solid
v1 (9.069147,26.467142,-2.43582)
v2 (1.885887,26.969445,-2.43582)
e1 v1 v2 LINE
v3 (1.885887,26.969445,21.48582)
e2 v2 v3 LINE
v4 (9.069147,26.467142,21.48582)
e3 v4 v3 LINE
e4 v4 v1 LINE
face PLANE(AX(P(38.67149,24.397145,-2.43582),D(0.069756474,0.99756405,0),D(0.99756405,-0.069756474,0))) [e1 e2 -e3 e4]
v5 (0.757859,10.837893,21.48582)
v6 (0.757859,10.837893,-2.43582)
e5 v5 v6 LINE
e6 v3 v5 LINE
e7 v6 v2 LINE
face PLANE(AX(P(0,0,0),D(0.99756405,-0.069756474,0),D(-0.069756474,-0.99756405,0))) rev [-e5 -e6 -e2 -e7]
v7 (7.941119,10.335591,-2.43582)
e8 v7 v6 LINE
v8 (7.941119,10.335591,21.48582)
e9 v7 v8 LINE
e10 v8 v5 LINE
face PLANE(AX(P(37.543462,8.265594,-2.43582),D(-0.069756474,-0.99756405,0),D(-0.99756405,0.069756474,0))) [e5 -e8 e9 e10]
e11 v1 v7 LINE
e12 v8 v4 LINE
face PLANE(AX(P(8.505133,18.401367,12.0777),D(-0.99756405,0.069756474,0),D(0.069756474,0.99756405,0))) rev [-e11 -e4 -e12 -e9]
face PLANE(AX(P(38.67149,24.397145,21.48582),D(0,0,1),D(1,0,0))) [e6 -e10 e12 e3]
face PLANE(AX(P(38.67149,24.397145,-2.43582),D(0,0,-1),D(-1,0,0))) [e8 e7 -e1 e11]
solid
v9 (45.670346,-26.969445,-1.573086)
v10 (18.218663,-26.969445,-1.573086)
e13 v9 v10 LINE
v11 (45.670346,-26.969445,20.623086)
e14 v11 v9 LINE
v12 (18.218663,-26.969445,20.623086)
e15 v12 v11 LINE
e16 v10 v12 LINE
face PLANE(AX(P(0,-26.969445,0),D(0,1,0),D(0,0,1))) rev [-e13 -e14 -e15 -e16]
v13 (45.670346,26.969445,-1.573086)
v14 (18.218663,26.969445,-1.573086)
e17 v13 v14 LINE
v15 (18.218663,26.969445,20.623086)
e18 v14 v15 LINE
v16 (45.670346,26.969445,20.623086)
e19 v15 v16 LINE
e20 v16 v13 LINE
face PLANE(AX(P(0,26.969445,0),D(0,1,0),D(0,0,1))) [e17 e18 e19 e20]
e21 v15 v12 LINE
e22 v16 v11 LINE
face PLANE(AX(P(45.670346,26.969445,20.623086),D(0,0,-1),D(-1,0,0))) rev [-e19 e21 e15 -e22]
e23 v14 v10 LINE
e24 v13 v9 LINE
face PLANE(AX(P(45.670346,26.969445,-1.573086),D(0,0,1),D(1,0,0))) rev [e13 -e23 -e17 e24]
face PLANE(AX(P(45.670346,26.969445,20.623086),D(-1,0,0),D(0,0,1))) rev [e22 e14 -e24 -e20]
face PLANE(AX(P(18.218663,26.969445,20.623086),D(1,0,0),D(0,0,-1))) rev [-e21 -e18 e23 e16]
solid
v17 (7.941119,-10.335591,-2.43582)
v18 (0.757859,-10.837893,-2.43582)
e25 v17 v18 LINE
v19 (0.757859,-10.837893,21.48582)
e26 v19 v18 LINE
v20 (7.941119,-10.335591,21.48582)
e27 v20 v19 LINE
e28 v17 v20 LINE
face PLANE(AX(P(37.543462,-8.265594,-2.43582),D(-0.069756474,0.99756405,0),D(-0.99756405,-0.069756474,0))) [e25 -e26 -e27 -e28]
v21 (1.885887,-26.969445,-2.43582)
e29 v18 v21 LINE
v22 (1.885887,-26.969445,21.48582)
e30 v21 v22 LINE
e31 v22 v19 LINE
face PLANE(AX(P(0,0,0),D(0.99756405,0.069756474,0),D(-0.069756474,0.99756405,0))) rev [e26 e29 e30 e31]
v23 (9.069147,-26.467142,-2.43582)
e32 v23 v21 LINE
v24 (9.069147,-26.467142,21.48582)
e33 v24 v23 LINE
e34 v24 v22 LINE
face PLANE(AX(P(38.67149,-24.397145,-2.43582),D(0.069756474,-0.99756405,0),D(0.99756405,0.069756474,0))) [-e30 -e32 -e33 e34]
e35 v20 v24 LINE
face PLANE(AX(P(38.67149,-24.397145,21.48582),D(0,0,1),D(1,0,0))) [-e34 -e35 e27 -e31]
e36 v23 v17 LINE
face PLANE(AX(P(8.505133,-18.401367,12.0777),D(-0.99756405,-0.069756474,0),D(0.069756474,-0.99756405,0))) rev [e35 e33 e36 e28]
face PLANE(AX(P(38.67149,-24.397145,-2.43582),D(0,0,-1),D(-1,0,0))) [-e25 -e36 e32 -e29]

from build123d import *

# Parameters (mm, degrees)
BODY_DEPTH                     = 19.05
SKETCH4_R                      = 5.9436
F_10_HEAD_CLEARANCE_DEPTH      = 48.971655672
F_10_NUT_CLEARANCE_DEPTH       = 46.868801757
F_10_NUT_CLEARANCE_DEPTH_BACK  = 4.7625
FILLET2_R                      = 8.89
F_10_CLEARANCE_HOLE1_D         = 5.1054
FILLET3_R                      = 5.08
FILLET4_R                      = 2.54
F_10_CLEARANCE_HOLE2_D         = 5.1054
SKETCH11_W                     = 23.92163958
SKETCH11_H                     = 16.170942948
INFILL_BOX_MOUNT_DEPTH         = 7.2008
INFILL_BOUNDING_BOX_DEPTH      = 26.969445
INFILL_BOUNDING_BOX_DEPTH_BACK = 26.969445
SKETCH9_W                      = 27.451683019
SKETCH9_H                      = 22.196172726


# Read off the part's stored shape, not the designer's step: Body
with BuildPart() as part:
    # Body outline → Body (new body)
    with BuildSketch(Plane.XY):
        with BuildLine():
            ThreePointArc((19.563256599, 8.1915), (16.002518677, 13.919090379), (10.823670896, 18.239238727))
            Line((10.823670896, 18.239238727), (11.330509573, 25.487369503))
            Line((11.330509573, 25.487369503), (1.828711995, 26.151799916))
            Line((1.828711995, 26.151799916), (0.815034639, 11.655538363))
            ThreePointArc((0.815034639, 11.655538363), (11.684, 0), (0.815034639, -11.655538363))
            Line((0.815034639, -11.655538363), (1.828711995, -26.151799916))
            Line((1.828711995, -26.151799916), (11.330509573, -25.487369503))
            Line((11.330509573, -25.487369503), (10.823670896, -18.239238727))
            ThreePointArc((10.823670896, -18.239238727), (16.002518677, -13.919090379), (19.563256599, -8.1915))
            Line((19.563256599, -8.1915), (41.469504125, -8.1915))
            Line((41.469504125, -8.1915), (41.469504125, -5.0165))
            Line((41.469504125, -5.0165), (20.607193131, -5.0165))
            ThreePointArc((20.607193131, -5.0165), (20.948626487, -3.313114744), (21.149504125, -1.5875))
            Line((21.149504125, -1.5875), (41.469504125, -1.5875))
            Line((41.469504125, -1.5875), (41.469504125, 1.5875))
            Line((41.469504125, 1.5875), (21.149504125, 1.5875))
            ThreePointArc((21.149504125, 1.5875), (20.948626487, 3.313114744), (20.607193131, 5.0165))
            Line((20.607193131, 5.0165), (41.469504125, 5.0165))
            Line((41.469504125, 5.0165), (41.469504125, 8.1915))
            Line((41.469504125, 8.1915), (19.563256599, 8.1915))
        make_face()
    extrude(amount=BODY_DEPTH)

    # Sketch3 → CBORE for #10 Binding Head Machine Screw1 (revolve, cut)
    with BuildSketch(Plane(origin=(10.823670896, -18.239238727, 9.525), x_dir=(-0.06975647374412856, 0.9975640502598241, 0), z_dir=(0, 0, 1))):
        Polygon((0, 0), (0, 10.536208088), (2.5527, 10.536208088), (2.5527, 3.1242), (5.9436, 3.1242), (5.9436, 0), align=None)
    revolve(axis=Axis((17.158202615, -17.796285119, 9.525), (-0.9975640502598241, -0.06975647374412855, 0)), mode=Mode.SUBTRACT)

    # Sketch4 → #10 Head clearance (cut, through all)
    with BuildSketch(Plane(origin=(6.385207973, 0.446497237, 0), x_dir=(-0.06975647374412856, 0.9975640502598241, 0), z_dir=(0.9975640502598241, 0.06975647374412856, 0))):
        with Locations((-18.949829973, 9.525)):
            Circle(SKETCH4_R)
    extrude(amount=F_10_HEAD_CLEARANCE_DEPTH, mode=Mode.SUBTRACT)

    # Sketch5 → #10 nut clearance (cut, two sides: drawn at the far end of the back side and taken through both)
    with BuildSketch(Plane(origin=(9.501797579, -0.664430412, 0), x_dir=(-0.06975647374412855, -0.9975640502598241, 0), z_dir=(0.9975640502598241, -0.06975647374412855, 0)).offset(-F_10_NUT_CLEARANCE_DEPTH_BACK)):
        Polygon((-23.902829973, -6.665384117), (-23.902829973, -12.384615883), (-18.949829973, -15.244231767), (-13.996829973, -12.384615883), (-13.996829973, -6.665384117), (-18.949829973, -3.805768233), align=None)
    extrude(amount=F_10_NUT_CLEARANCE_DEPTH + F_10_NUT_CLEARANCE_DEPTH_BACK, mode=Mode.SUBTRACT)

    # Fillet2
    fillet2_edges = [part.edges().sort_by_distance(p)[0] for p in [
        (41.469504125, 6.604, 0),
        (41.469504125, 0, 0),
        (41.469504125, -6.604, 0),
        (41.469504125, -6.604, 19.05),
        (41.469504125, 0, 19.05),
        (41.469504125, 6.604, 19.05),
    ]]
    fillet(fillet2_edges, radius=FILLET2_R)

    # #10 Clearance Hole1 (through all)
    with Locations(Plane(origin=(0, -8.1915, 0), x_dir=(-1, 0, 0), z_dir=(0, -1, 0))):
        with Locations((-31.944504125, -9.525)):
            Hole(F_10_CLEARANCE_HOLE1_D / 2)

    # Fillet3
    fillet3_edges = [part.edges().sort_by_distance(p)[0] for p in [
        (19.563256599, 8.1915, 9.525),
        (19.563256599, -8.1915, 9.525),
    ]]
    fillet(fillet3_edges, radius=FILLET3_R)

    # Fillet4
    # the kernel refuses this fillet: 2.54 mm, written as the material it adds along each edge
    with BuildSketch(Plane(origin=(10.823670896, 18.239238727, 0), x_dir=(0.06975647364615441, 0.997564050266675, 0), z_dir=(0, 0, 1))) as fillet4_piece_1_section:
        with BuildLine():
            CenterArc((1.506239444, -2.54), FILLET4_R, 90, 59.467874794)
            ThreePointArc((-0.681575467, -1.249625668), (-0.330301403, -0.630532327), (0, 0))
            Line((0, 0), (1.506239444, 0))
        make_face()
    fillet4_piece_1 = extrude(amount=7.571366843, mode=Mode.PRIVATE)
    fillet4_piece_1 = split(fillet4_piece_1, bisect_by=Plane(origin=(11.045496334, 17.483235197, 3.379286412), z_dir=(0.034878236872064254, 0.49878202512991177, -0.8660254037844389)), keep=Keep.TOP, mode=Mode.PRIVATE)
    fillet4_piece_1 = split(fillet4_piece_1, bisect_by=Plane(origin=(11.16675059, 19.217251842, 3.228670408), z_dir=(-0.0348782368720643, -0.49878202512991243, -0.8660254037844384)), keep=Keep.TOP, mode=Mode.PRIVATE)
    add(fillet4_piece_1)
    with BuildSketch(Plane(origin=(10.823670896, 18.239238727, 0), x_dir=(0.06975647364615441, 0.997564050266675, 0), z_dir=(0, 0, 1))) as fillet4_piece_2_section:
        with BuildLine():
            CenterArc((1.506239444, -2.54), FILLET4_R, 90, 59.467874794)
            ThreePointArc((-0.681575467, -1.249625668), (-0.330301403, -0.630532327), (0, 0))
            Line((0, 0), (1.506239444, 0))
        make_face()
    fillet4_piece_2 = extrude(amount=7.571366843, mode=Mode.PRIVATE)
    fillet4_piece_2 = split(fillet4_piece_2, bisect_by=Plane(origin=(11.538192523, 17.902598899, 3.640659173), z_dir=(-0.034878236872064254, -0.49878202512991177, 0.8660254037844389)), keep=Keep.TOP, mode=Mode.PRIVATE)
    fillet4_piece_2 = split(fillet4_piece_2, bisect_by=Plane(origin=(11.538192523, 17.902598899, 3.970877294), z_dir=(-0.0348782368720643, -0.49878202512991243, -0.8660254037844384)), keep=Keep.TOP, mode=Mode.PRIVATE)
    add(fillet4_piece_2)
    with BuildSketch(Plane(origin=(10.823670896, 18.239238727, 0), x_dir=(0.06975647364615441, 0.997564050266675, 0), z_dir=(0, 0, 1))) as fillet4_piece_3_section:
        with BuildLine():
            CenterArc((1.506239444, -2.54), FILLET4_R, 90, 59.467874794)
            ThreePointArc((-0.681575467, -1.249625668), (-0.330301403, -0.630532327), (0, 0))
            Line((0, 0), (1.506239444, 0))
        make_face()
    fillet4_piece_3 = extrude(amount=7.571366843, mode=Mode.PRIVATE)
    fillet4_piece_3 = split(fillet4_piece_3, bisect_by=Plane(origin=(10.910701379, 18.802736053, 4.133816124), z_dir=(0.034878236872064254, 0.49878202512991177, -0.8660254037844389)), keep=Keep.TOP, mode=Mode.PRIVATE)
    fillet4_piece_3 = split(fillet4_piece_3, bisect_by=Plane(origin=(10.910701379, 18.802736053, 3.477720343), z_dir=(0.0348782368720643, 0.49878202512991243, 0.8660254037844384)), keep=Keep.TOP, mode=Mode.PRIVATE)
    add(fillet4_piece_3)
    with BuildSketch(Plane(origin=(10.823670896, 18.239238727, 11.478633157), x_dir=(0.06975647364615441, 0.997564050266675, 0), z_dir=(0, 0, 1))) as fillet4_piece_4_section:
        with BuildLine():
            CenterArc((1.506239444, -2.54), FILLET4_R, 90, 59.467874794)
            ThreePointArc((-0.681575467, -1.249625668), (-0.330301403, -0.630532327), (0, 0))
            Line((0, 0), (1.506239444, 0))
        make_face()
    fillet4_piece_4 = extrude(amount=7.571366843, mode=Mode.PRIVATE)
    fillet4_piece_4 = split(fillet4_piece_4, bisect_by=Plane(origin=(11.538192523, 17.902598899, 15.409340827), z_dir=(-0.03487823687206431, -0.4987820251299125, -0.8660254037844386)), keep=Keep.TOP, mode=Mode.PRIVATE)
    fillet4_piece_4 = split(fillet4_piece_4, bisect_by=Plane(origin=(11.538192523, 17.902598899, 15.079122706), z_dir=(-0.034878236872064254, -0.49878202512991177, 0.8660254037844388)), keep=Keep.TOP, mode=Mode.PRIVATE)
    add(fillet4_piece_4)
    with BuildSketch(Plane(origin=(10.823670896, 18.239238727, 11.478633157), x_dir=(0.06975647364615441, 0.997564050266675, 0), z_dir=(0, 0, 1))) as fillet4_piece_5_section:
        with BuildLine():
            CenterArc((1.506239444, -2.54), FILLET4_R, 90, 59.467874794)
            ThreePointArc((-0.681575467, -1.249625668), (-0.330301403, -0.630532327), (0, 0))
            Line((0, 0), (1.506239444, 0))
        make_face()
    fillet4_piece_5 = extrude(amount=7.571366843, mode=Mode.PRIVATE)
    fillet4_piece_5 = split(fillet4_piece_5, bisect_by=Plane(origin=(10.910701379, 18.802736053, 14.916183876), z_dir=(0.03487823687206431, 0.4987820251299125, 0.8660254037844386)), keep=Keep.TOP, mode=Mode.PRIVATE)
    fillet4_piece_5 = split(fillet4_piece_5, bisect_by=Plane(origin=(10.910701379, 18.802736053, 15.572279657), z_dir=(0.034878236872064254, 0.49878202512991177, -0.8660254037844388)), keep=Keep.TOP, mode=Mode.PRIVATE)
    add(fillet4_piece_5)
    with BuildSketch(Plane(origin=(10.823670896, 18.239238727, 11.478633157), x_dir=(0.06975647364615441, 0.997564050266675, 0), z_dir=(0, 0, 1))) as fillet4_piece_6_section:
        with BuildLine():
            CenterArc((1.506239444, -2.54), FILLET4_R, 90, 59.467874794)
            ThreePointArc((-0.681575467, -1.249625668), (-0.330301403, -0.630532327), (0, 0))
            Line((0, 0), (1.506239444, 0))
        make_face()
    fillet4_piece_6 = extrude(amount=7.571366843, mode=Mode.PRIVATE)
    fillet4_piece_6 = split(fillet4_piece_6, bisect_by=Plane(origin=(11.045496334, 17.483235197, 15.670713588), z_dir=(0.03487823687206431, 0.4987820251299125, 0.8660254037844386)), keep=Keep.TOP, mode=Mode.PRIVATE)
    fillet4_piece_6 = split(fillet4_piece_6, bisect_by=Plane(origin=(11.16675059, 19.217251842, 15.821329592), z_dir=(-0.034878236872064254, -0.49878202512991177, 0.8660254037844388)), keep=Keep.TOP, mode=Mode.PRIVATE)
    add(fillet4_piece_6)
    with BuildSketch(Plane(origin=(10.823670896, -18.239238727, 0), x_dir=(0.8423668352181145, 0.5389045508479382, 0), z_dir=(0, 0, 1))) as fillet4_piece_7_section:
        with BuildLine():
            CenterArc((1.50864912, -2.538569498), FILLET4_R, 91.92302723, 59.467874794)
            Line((-0.721234541, -1.322338081), (0, 0))
            ThreePointArc((0, 0), (0.711707353, -0.011944694), (1.423414707, 0))
        make_face()
    fillet4_piece_7 = extrude(amount=7.34699861, mode=Mode.PRIVATE)
    fillet4_piece_7 = fillet4_piece_7 - Plane(origin=(11.093024208, -18.220403709, 9.525), x_dir=(-0.06975647374412856, 0.9975640502598241, 0), z_dir=(-0.9975640502598241, -0.06975647374412856, 0)) * Cylinder(5.9436, 21, mode=Mode.PRIVATE)
    add(fillet4_piece_7)
    with BuildSketch(Plane(origin=(10.823670896, -18.239238727, 11.70300139), x_dir=(0.8423668352181142, 0.5389045508479389, 0), z_dir=(0, 0, 1))) as fillet4_piece_8_section:
        with BuildLine():
            CenterArc((1.50864912, -2.538569498), FILLET4_R, 91.92302723, 59.467874794)
            Line((-0.721234541, -1.322338081), (0, 0))
            ThreePointArc((0, 0), (0.711707353, -0.011944694), (1.423414707, 0))
        make_face()
    fillet4_piece_8 = extrude(amount=7.34699861, mode=Mode.PRIVATE)
    fillet4_piece_8 = fillet4_piece_8 - Plane(origin=(11.09302416, -18.220403712, 9.525), x_dir=(-0.06975647374412856, 0.9975640502598241, 0), z_dir=(-0.9975640502598241, -0.06975647374412856, 0)) * Cylinder(5.9436, 21, mode=Mode.PRIVATE)
    add(fillet4_piece_8)
    # the kernel refuses this fillet: 2.54 mm, written as the material it takes off along each edge
    with BuildSketch(Plane(origin=(11.330509573, -25.487369503, -6.349999999), x_dir=(-0.06975647364615452, 0.997564050266675, 0), z_dir=(0, 0, 1)), Plane(origin=(11.330509573, 25.487369503, -6.349999999), x_dir=(-0.997564050255164, 0.06975647381076958, 0), z_dir=(0, 0, 1))) as fillet4_2_piece_1:
        with BuildLine():
            CenterArc((FILLET4_R, FILLET4_R), FILLET4_R, 180.000000009, 89.999999991)
            Line((-FILLET4_R * 1.65018418464e-10, FILLET4_R), (0, 0))
            Line((0, 0), (FILLET4_R, 0))
        make_face()
    extrude(amount=31.749999998, mode=Mode.SUBTRACT)
    with BuildSketch(Plane(origin=(1.828711995, -26.151799916, -6.35), x_dir=(0.9975640502551639, 0.0697564738107699, 0), z_dir=(0, 0, 1)), Plane(origin=(1.828711995, 26.151799916, -6.35), x_dir=(-0.06975647377832653, -0.9975640502574327, 0), z_dir=(0, 0, 1))) as fillet4_2_piece_2:
        with BuildLine():
            CenterArc((FILLET4_R, FILLET4_R), FILLET4_R, 179.999999998, 90.000000002)
            Line((0, FILLET4_R), (0, 0))
            Line((0, 0), (FILLET4_R, 0))
        make_face()
    extrude(amount=31.75, mode=Mode.SUBTRACT)
    with BuildSketch(Plane(origin=(0.815034639, -11.655538363, -5.778442378), x_dir=(0.06975647377832637, -0.9975640502574326, 0), z_dir=(0, 0, 1))) as fillet4_2_piece_3:
        with BuildLine():
            CenterArc((2.311376951, 2.54), FILLET4_R, 190.286560608, 79.713439392)
            ThreePointArc((-0.187797504, 2.086428572), (-0.047044084, 1.047431631), (0, 0))
            Line((0, 0), (2.311376951, 0))
        make_face()
    extrude(amount=30.606884756, mode=Mode.SUBTRACT)
    with BuildSketch(Plane(origin=(0.815034639, 11.655538363, -5.778442378), x_dir=(0.9872940550084358, -0.1589038984575255, 0), z_dir=(0, 0, 1))) as fillet4_2_piece_4:
        with BuildLine():
            CenterArc((2.322565791, 2.529773025), FILLET4_R, 185.143280302, 79.713439392)
            Line((-0.207207235, 2.302070497), (0, 0))
            ThreePointArc((0, 0), (1.047431631, 0.047044085), (2.094863262, 0))
        make_face()
    extrude(amount=30.606884756, mode=Mode.SUBTRACT)

    # #10 Clearance Hole2 (through all)
    with Locations(Plane(origin=(4.750898789, -0.332215206, 0), x_dir=(0, 0, -1), z_dir=(0.9975640502598241, -0.06975647374412854, 0))):
        with Locations((-9.525, 18.949829973)):
            Hole(F_10_CLEARANCE_HOLE2_D / 2)


with BuildPart() as body_2:
    # Sketch11 → Infill box -mount (new body)
    with BuildSketch(Plane(origin=(0, 0, 0), x_dir=(0, 0, 1), z_dir=(-0.9975640502598241, -0.06975647374412852, 0))):
        with Locations((9.525, -18.949829973)):
            Rectangle(SKETCH11_W, SKETCH11_H)
    extrude(amount=-INFILL_BOX_MOUNT_DEPTH)


with BuildPart() as body_3:
    # Mirror3: mirrored copy
    add(body_2.part.mirror(Plane.ZX))


with BuildPart() as body_4:
    # Sketch9 → Infill bounding box (new, two sides: drawn at the far end of the back side and taken through both)
    with BuildSketch(Plane(origin=(0, 0, 0), x_dir=(1, 0, 0), z_dir=(0, 1, 0)).offset(-INFILL_BOUNDING_BOX_DEPTH_BACK)):
        with Locations((31.944504126, -9.525)):
            Rectangle(SKETCH9_W, SKETCH9_H)
    extrude(amount=INFILL_BOUNDING_BOX_DEPTH + INFILL_BOUNDING_BOX_DEPTH_BACK)


solid = Compound([body_2.part, body_3.part, body_4.part])
